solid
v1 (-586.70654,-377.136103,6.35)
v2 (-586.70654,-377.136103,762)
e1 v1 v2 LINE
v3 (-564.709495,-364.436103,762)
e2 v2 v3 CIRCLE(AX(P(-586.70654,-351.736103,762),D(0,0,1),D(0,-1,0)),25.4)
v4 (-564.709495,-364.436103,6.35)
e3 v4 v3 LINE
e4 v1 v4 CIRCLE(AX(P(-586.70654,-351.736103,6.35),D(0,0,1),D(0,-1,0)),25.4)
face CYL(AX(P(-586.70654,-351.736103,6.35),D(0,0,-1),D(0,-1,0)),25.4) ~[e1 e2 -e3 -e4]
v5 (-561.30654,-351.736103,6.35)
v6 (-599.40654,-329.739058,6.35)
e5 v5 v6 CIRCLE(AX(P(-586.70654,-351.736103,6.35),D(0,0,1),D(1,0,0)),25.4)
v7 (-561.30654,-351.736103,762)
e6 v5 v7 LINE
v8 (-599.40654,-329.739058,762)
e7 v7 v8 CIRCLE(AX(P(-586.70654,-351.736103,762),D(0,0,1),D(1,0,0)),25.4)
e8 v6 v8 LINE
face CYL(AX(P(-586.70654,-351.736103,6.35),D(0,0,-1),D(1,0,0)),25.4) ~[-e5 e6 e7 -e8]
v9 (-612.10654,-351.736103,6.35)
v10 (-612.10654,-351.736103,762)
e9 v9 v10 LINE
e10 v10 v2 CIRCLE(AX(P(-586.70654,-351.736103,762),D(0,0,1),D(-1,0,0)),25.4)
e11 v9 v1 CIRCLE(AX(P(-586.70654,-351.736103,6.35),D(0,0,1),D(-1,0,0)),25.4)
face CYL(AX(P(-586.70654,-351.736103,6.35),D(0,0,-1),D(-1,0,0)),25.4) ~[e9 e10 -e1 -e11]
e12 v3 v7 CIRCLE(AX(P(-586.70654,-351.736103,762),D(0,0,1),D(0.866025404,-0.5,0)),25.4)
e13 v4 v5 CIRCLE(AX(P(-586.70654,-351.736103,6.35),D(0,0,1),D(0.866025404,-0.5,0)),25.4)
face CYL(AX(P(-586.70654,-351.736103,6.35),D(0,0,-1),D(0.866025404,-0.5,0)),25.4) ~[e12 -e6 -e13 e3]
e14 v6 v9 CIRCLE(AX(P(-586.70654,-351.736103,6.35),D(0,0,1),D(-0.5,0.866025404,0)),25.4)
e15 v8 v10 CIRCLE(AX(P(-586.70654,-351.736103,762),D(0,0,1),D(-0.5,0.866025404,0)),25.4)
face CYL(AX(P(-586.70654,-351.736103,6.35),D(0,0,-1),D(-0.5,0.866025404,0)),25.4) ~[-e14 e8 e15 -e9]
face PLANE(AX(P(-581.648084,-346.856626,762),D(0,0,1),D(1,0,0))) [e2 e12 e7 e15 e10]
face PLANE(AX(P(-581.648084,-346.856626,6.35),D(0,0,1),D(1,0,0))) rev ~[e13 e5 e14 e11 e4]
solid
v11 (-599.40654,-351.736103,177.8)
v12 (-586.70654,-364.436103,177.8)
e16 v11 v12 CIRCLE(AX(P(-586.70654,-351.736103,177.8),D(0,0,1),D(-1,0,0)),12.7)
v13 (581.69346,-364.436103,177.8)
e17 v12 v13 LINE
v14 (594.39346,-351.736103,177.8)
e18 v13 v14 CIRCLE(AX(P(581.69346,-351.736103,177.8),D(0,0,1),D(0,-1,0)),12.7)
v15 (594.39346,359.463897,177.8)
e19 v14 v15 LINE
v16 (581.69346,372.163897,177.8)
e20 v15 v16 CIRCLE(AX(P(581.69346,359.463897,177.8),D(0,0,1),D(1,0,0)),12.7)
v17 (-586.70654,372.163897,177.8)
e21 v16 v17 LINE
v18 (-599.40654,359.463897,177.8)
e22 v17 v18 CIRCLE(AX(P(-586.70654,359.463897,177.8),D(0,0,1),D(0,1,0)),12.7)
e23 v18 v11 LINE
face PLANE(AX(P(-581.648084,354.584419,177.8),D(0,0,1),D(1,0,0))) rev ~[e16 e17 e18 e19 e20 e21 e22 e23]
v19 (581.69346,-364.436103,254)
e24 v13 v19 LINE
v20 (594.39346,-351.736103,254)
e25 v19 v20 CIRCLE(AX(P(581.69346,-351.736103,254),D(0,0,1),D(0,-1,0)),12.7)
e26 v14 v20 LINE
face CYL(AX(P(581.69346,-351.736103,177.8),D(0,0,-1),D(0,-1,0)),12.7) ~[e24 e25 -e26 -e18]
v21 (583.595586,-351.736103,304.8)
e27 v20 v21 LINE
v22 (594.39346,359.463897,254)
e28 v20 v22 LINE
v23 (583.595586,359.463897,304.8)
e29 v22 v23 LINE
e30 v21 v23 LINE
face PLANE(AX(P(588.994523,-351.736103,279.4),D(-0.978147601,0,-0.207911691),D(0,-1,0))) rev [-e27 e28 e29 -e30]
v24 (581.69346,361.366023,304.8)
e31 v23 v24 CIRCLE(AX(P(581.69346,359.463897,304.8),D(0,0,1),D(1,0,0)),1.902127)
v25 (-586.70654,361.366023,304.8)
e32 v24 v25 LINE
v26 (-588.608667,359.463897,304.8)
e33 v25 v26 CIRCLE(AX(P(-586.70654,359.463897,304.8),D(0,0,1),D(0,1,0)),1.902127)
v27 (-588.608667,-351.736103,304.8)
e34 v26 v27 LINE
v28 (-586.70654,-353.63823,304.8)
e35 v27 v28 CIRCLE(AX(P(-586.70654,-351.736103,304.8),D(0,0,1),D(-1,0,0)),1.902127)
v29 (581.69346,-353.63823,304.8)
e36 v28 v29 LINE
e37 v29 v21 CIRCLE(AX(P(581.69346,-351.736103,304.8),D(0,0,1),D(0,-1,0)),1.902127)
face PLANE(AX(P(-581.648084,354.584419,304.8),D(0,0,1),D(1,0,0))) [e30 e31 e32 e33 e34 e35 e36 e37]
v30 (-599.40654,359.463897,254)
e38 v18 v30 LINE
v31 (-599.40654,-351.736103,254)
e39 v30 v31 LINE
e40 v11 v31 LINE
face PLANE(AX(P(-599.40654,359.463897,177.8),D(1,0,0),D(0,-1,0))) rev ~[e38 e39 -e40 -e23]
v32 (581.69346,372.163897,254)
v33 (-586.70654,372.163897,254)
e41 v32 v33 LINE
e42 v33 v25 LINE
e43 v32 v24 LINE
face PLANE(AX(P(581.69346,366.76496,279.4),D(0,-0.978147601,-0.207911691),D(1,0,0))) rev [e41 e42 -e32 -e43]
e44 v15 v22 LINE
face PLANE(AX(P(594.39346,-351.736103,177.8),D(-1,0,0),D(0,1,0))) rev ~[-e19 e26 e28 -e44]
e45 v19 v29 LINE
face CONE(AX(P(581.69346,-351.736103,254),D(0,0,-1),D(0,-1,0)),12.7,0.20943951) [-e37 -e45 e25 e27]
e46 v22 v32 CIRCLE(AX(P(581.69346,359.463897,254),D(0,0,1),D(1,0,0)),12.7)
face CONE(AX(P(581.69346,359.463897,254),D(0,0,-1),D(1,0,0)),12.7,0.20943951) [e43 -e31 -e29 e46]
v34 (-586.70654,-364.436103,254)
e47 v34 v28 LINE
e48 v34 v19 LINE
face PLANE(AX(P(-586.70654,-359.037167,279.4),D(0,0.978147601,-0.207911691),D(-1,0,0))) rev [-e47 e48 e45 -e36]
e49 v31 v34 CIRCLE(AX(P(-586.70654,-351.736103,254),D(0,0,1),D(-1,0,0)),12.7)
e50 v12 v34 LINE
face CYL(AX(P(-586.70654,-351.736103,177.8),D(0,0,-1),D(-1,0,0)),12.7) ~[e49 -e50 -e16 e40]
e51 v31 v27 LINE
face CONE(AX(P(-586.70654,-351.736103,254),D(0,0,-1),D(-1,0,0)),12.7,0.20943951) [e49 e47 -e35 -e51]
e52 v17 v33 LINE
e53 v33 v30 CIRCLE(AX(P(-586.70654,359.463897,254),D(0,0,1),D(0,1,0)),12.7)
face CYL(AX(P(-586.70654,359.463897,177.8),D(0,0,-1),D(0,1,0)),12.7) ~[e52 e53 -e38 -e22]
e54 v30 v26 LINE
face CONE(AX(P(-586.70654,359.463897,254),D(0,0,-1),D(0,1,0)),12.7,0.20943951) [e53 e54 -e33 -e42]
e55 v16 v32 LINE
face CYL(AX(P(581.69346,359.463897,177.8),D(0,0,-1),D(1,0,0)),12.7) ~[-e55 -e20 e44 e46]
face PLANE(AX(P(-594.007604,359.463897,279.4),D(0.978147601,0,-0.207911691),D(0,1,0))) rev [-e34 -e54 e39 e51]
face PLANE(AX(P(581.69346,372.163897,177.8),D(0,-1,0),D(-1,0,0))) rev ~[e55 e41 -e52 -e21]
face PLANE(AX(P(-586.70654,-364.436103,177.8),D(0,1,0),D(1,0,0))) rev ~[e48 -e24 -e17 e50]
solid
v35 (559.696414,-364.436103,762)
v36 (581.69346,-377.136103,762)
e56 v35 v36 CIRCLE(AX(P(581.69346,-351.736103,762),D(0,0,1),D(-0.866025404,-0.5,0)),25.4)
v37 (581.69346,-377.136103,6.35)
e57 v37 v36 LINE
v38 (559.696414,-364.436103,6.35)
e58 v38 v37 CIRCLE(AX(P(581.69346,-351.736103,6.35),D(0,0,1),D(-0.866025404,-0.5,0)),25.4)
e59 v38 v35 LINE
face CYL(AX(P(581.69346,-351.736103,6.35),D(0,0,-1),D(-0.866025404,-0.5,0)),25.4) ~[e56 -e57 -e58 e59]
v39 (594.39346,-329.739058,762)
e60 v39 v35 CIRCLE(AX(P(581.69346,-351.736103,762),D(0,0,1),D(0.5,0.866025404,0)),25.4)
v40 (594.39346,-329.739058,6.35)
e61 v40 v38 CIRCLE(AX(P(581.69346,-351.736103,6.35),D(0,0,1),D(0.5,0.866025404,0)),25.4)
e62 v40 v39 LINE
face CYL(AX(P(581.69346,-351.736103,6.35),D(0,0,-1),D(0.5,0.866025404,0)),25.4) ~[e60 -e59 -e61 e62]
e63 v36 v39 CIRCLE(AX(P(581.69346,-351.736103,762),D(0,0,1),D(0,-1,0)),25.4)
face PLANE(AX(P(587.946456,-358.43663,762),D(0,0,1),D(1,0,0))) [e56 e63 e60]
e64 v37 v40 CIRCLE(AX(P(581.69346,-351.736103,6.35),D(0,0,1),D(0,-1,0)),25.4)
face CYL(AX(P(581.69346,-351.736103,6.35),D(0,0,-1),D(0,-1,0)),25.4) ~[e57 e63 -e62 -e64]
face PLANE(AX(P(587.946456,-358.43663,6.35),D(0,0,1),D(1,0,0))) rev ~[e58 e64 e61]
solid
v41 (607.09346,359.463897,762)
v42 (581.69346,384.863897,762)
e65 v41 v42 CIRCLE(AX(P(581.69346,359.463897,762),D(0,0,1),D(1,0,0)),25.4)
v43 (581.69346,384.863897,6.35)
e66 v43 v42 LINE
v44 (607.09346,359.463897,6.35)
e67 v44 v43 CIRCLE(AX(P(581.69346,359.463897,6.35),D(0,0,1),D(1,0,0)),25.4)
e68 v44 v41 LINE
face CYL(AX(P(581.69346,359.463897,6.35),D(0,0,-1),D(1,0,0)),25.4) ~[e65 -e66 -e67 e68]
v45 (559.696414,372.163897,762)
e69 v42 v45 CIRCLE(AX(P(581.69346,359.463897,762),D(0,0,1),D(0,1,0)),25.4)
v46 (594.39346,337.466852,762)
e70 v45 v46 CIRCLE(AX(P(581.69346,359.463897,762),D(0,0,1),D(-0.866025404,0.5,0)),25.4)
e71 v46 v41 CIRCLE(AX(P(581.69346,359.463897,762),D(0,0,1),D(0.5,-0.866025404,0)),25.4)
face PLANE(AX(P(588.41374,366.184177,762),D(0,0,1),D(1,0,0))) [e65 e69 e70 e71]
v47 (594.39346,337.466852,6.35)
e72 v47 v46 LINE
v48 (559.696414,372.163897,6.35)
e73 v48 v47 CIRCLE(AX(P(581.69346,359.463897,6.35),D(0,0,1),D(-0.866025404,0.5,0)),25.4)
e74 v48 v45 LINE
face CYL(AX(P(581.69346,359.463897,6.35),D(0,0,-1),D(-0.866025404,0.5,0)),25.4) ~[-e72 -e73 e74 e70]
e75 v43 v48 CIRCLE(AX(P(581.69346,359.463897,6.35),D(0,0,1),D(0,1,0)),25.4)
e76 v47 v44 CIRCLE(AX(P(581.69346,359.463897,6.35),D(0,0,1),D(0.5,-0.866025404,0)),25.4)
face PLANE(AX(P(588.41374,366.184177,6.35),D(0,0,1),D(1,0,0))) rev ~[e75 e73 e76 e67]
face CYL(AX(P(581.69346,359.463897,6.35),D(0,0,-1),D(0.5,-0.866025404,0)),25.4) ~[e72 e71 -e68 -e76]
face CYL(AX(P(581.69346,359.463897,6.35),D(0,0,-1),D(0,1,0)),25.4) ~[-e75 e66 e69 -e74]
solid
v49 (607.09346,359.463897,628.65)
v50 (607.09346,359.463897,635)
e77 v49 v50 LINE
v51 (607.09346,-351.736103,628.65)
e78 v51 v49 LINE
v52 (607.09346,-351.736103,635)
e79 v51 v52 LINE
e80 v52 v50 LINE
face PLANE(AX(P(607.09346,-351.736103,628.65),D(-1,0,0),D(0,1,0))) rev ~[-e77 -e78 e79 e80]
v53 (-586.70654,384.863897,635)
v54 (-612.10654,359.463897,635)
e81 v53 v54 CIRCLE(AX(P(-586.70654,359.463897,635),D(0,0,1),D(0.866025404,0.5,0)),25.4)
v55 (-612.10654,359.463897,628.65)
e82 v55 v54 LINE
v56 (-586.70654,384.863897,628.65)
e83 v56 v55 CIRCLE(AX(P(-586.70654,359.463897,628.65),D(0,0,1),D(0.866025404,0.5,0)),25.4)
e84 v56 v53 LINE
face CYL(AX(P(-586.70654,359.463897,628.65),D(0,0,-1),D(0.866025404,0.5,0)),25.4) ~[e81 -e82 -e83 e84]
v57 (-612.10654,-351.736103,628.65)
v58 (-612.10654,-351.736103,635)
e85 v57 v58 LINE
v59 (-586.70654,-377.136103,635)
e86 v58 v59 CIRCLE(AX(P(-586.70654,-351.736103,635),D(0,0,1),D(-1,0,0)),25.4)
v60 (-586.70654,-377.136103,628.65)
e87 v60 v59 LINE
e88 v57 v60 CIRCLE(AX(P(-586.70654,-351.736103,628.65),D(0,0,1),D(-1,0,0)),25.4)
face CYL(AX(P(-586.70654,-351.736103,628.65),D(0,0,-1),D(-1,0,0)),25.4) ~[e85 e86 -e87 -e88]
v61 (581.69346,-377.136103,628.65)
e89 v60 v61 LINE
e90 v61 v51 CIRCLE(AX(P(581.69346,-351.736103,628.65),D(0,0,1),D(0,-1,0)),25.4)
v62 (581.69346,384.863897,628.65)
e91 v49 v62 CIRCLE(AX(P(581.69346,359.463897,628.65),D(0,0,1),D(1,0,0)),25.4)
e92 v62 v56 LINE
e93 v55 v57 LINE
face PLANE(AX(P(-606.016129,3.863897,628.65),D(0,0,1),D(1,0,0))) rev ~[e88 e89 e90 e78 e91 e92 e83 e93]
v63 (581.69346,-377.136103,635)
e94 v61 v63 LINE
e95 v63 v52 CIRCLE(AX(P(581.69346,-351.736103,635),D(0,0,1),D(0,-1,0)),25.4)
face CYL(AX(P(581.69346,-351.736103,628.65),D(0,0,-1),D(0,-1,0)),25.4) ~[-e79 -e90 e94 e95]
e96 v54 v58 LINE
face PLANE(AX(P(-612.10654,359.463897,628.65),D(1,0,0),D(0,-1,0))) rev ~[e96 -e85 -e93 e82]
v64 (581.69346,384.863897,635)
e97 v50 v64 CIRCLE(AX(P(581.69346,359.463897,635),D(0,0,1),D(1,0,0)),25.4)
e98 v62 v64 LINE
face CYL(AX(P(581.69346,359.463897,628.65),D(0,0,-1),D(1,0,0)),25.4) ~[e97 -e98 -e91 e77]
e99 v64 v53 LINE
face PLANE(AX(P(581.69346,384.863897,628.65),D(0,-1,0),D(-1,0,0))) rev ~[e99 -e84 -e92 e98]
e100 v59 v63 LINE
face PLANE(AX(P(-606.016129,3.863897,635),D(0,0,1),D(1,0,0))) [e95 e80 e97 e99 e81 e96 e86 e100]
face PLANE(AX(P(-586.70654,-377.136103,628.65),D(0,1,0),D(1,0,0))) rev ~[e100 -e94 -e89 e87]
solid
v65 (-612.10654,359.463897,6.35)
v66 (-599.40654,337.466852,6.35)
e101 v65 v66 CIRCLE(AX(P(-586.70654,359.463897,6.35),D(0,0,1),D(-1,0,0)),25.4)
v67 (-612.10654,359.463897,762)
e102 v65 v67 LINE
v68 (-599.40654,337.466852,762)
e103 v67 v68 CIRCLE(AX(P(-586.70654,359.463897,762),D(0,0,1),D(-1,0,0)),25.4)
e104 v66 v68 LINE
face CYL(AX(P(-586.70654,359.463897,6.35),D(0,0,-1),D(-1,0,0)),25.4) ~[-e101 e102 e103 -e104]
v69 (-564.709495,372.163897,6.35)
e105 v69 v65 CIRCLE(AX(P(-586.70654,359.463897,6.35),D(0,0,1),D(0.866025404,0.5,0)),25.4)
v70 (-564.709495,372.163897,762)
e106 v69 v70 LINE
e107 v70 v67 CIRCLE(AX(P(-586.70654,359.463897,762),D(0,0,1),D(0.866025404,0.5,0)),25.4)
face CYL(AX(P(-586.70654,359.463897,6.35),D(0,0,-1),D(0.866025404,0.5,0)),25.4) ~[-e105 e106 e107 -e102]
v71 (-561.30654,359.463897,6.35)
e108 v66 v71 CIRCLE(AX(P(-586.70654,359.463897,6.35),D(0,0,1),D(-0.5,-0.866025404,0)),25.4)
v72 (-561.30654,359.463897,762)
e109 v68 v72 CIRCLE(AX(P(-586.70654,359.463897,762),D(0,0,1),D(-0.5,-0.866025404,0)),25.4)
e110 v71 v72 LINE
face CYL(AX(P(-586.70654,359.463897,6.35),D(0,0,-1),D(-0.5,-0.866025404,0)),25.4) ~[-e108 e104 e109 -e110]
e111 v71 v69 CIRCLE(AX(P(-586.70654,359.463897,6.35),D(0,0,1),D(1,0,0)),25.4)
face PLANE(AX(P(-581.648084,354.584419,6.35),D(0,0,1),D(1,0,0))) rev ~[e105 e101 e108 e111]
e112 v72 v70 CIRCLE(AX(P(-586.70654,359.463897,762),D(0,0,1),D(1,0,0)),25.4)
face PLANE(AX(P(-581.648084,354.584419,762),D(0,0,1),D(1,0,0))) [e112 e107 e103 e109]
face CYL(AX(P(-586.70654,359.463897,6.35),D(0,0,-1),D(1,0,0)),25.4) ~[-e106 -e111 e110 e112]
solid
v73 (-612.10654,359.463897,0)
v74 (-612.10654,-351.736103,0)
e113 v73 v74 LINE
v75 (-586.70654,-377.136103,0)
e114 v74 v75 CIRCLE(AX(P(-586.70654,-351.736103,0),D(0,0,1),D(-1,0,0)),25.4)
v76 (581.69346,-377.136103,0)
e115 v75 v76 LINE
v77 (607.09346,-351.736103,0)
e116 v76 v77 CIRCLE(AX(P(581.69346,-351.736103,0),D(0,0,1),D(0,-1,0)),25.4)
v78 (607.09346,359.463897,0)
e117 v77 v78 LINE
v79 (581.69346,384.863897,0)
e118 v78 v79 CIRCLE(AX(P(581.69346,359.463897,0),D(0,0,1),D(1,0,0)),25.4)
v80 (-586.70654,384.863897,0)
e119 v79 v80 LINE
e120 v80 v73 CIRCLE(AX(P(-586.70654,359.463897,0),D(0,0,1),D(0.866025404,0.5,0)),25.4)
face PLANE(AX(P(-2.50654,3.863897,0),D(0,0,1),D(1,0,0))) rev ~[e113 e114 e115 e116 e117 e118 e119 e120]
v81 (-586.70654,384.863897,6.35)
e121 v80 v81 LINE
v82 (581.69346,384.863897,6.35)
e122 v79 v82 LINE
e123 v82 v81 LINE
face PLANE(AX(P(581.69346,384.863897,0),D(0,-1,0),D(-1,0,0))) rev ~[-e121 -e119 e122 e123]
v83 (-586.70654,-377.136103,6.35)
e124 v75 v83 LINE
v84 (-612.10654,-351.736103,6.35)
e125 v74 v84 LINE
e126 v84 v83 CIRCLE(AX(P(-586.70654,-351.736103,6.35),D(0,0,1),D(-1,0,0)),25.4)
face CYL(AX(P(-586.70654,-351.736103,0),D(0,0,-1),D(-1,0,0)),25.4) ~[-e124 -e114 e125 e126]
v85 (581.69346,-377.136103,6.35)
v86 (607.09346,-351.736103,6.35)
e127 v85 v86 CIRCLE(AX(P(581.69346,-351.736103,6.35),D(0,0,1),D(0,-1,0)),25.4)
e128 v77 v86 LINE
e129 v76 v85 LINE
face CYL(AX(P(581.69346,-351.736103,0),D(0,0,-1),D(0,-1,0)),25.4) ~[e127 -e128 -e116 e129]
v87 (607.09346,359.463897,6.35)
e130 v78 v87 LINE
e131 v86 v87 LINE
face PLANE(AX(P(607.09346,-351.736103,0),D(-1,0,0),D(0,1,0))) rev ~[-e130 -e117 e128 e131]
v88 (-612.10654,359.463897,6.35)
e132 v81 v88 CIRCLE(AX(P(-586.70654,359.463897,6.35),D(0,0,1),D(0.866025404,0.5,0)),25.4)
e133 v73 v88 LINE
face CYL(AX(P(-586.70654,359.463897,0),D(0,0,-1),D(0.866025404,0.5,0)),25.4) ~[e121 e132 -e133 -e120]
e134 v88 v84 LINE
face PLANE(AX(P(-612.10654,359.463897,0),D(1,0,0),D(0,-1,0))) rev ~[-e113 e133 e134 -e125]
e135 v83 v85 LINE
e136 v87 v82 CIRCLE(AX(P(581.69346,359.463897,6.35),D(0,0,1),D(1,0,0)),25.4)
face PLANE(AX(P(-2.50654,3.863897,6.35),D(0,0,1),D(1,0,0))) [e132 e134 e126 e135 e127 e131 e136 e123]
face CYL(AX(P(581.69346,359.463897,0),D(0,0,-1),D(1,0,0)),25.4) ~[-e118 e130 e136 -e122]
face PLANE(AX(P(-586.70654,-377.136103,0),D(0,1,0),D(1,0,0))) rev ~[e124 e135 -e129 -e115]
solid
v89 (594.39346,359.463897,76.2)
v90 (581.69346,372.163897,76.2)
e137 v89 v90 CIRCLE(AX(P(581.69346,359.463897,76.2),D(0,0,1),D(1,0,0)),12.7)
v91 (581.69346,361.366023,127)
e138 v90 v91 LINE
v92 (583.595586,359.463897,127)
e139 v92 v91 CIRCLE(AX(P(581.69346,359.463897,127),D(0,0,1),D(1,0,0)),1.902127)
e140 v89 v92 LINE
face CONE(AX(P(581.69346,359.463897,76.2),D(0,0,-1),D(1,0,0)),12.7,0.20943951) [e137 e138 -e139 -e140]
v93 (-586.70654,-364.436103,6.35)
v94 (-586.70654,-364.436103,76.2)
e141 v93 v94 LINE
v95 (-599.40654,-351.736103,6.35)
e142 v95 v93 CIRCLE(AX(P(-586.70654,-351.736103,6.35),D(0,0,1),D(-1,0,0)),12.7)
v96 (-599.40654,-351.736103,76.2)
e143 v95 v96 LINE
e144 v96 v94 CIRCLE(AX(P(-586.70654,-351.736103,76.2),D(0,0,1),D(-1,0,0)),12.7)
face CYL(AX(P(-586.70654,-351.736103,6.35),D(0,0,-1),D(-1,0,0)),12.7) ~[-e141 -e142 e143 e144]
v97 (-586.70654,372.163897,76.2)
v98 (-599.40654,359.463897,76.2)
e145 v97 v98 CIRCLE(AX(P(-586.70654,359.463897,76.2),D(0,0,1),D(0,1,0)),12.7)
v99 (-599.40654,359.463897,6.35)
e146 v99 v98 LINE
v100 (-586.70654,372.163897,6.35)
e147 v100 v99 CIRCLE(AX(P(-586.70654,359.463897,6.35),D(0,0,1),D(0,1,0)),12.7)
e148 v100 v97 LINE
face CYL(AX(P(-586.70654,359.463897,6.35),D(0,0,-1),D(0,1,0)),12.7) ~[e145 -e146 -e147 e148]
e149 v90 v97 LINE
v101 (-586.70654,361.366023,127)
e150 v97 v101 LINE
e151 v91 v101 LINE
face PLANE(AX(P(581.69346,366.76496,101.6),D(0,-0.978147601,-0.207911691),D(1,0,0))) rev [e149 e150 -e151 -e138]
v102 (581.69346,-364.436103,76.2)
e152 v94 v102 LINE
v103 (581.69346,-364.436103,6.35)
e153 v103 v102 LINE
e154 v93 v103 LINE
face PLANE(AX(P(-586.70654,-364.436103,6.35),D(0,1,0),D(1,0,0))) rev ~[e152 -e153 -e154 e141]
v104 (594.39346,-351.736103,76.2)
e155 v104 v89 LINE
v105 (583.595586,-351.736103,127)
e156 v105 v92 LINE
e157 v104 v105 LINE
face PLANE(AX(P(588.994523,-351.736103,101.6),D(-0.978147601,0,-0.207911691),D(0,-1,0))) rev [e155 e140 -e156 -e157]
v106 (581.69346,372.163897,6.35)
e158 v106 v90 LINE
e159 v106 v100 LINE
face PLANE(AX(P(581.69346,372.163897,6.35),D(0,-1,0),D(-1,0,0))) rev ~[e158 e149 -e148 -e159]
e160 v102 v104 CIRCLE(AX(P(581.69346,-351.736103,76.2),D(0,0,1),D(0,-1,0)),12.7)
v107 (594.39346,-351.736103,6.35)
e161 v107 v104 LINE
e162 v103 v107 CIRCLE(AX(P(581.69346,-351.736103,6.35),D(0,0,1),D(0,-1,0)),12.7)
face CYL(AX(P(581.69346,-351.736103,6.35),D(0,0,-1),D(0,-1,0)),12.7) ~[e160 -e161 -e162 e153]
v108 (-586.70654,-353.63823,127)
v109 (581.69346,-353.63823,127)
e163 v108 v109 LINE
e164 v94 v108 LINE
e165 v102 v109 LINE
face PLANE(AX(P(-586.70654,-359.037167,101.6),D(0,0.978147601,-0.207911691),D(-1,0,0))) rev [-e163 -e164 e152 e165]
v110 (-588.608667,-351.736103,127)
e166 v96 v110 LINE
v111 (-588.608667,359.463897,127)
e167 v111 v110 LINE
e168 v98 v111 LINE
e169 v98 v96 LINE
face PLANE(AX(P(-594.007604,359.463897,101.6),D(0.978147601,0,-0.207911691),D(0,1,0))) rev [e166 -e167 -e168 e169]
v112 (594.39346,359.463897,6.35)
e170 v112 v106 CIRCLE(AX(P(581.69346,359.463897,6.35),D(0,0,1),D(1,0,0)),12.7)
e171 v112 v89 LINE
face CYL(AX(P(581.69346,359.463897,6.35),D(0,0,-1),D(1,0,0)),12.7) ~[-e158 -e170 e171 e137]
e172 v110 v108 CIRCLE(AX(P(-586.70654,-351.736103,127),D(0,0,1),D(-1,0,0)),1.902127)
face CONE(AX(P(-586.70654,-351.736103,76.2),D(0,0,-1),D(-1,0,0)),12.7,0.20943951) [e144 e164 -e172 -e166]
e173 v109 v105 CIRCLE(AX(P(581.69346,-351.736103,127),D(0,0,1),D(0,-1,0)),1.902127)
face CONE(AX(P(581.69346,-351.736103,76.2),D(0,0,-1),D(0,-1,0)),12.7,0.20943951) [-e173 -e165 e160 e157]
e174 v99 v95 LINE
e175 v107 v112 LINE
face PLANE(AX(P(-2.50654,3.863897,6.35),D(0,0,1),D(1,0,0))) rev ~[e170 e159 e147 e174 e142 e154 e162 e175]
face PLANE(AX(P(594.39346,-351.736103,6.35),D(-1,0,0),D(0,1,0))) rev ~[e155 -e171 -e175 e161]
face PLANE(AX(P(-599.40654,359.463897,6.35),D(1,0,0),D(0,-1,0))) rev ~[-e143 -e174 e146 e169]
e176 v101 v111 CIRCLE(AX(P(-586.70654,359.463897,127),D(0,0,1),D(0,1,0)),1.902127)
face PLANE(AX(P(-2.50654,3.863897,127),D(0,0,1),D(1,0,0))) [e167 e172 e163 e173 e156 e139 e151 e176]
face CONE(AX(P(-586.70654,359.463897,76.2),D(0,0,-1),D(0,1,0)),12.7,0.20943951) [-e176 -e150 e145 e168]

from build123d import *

# Parameters (mm, degrees)
F1_DEPTH = 6.35
F2_START = 6.35
F2_DEPTH = 120.65
F3_SIZE2 = 10.7978733328
F3_SIZE  = 50.8
F4_START = 6.35
F4_DEPTH = 755.65
F5_START = 628.65
F5_DEPTH = 6.35
F6_START = 177.8
F6_DEPTH = 127
F7_SIZE2 = 10.7978733328
F7_SIZE  = 50.8


# Not quite as in the source:
# - a feature names something its author has since deleted; it is built from what else it names


with BuildPart() as f1:
    # F0 (on Top) → F1 (new body)
    with BuildSketch(Plane.XY):
        Polygon((-421.6065403938, 372.1638967734), (-535.9065403938, 372.1638967734), (-535.9065403938, -364.4361032266), (-421.6065403938, -364.4361032266), (-383.5065403938, -364.4361032266), (378.4934596062, -364.4361032266), (416.5934596062, -364.4361032266), (530.8934596062, -364.4361032266), (530.8934596062, -219.4858193398), (530.8934596062, 237.7141806602), (530.8934596062, 372.1638967734), (416.5934596062, 372.1638967734), (378.4934596062, 372.1638967734), (-383.5065403938, 372.1638967734), align=None)
        Polygon((530.8934596062, 384.8638967734), (-535.9065403938, 384.8638967734), (-535.9065403938, 372.1638967734), (-421.6065403938, 372.1638967734), (-383.5065403938, 372.1638967734), (378.4934596062, 372.1638967734), (416.5934596062, 372.1638967734), (530.8934596062, 372.1638967734), align=None)
        Polygon((-421.6065403938, -364.4361032266), (-535.9065403938, -364.4361032266), (-535.9065403938, -377.1361032266), (530.8934596062, -377.1361032266), (530.8934596062, -364.4361032266), (416.5934596062, -364.4361032266), (378.4934596062, -364.4361032266), (-383.5065403938, -364.4361032266), align=None)
        with BuildLine():
            Line((607.0934596062, -351.7361032266), (607.0934596062, 359.4638967734))
            ThreePointArc((607.0934596062, 359.4638967734), (603.6905048623, 346.7638967734), (594.3934596062, 337.4668515172))
            Line((594.3934596062, 337.4668515172), (594.3934596062, 22.9138967734))
            Line((594.3934596062, 22.9138967734), (594.3934596062, -15.1861032266))
            Line((594.3934596062, -15.1861032266), (594.3934596062, -329.7390579705))
            ThreePointArc((594.3934596062, -329.7390579705), (603.6905048623, -339.0361032266), (607.0934596062, -351.7361032266))
        make_face()
        with BuildLine():
            ThreePointArc((-599.4065403938, 337.4668515172), (-608.70358565, 346.7638967734), (-612.1065403938, 359.4638967734))
            Line((-612.1065403938, 359.4638967734), (-612.1065403938, -351.7361032266))
            ThreePointArc((-612.1065403938, -351.7361032266), (-608.70358565, -339.0361032266), (-599.4065403938, -329.7390579705))
            Line((-599.4065403938, -329.7390579705), (-599.4065403938, -15.1861032266))
            Line((-599.4065403938, -15.1861032266), (-599.4065403938, 22.9138967734))
            Line((-599.4065403938, 22.9138967734), (-599.4065403938, 337.4668515172))
        make_face()
        with BuildLine():
            ThreePointArc((-561.3065403938, 359.4638967734), (-562.1720244061, 366.037900519), (-564.7094951377, 372.1638967734))
            Line((-564.7094951377, 372.1638967734), (-586.7065403938, 372.1638967734))
            ThreePointArc((-586.7065403938, 372.1638967734), (-595.6867965149, 368.4441528944), (-599.4065403938, 359.4638967734))
            Line((-599.4065403938, 359.4638967734), (-599.4065403938, 337.4668515172))
            ThreePointArc((-599.4065403938, 337.4668515172), (-574.0065403938, 337.4668515172), (-561.3065403938, 359.4638967734))
        make_face()
        with BuildLine():
            Line((581.6934596062, 372.1638967734), (559.69641435, 372.1638967734))
            ThreePointArc((559.69641435, 372.1638967734), (563.732947364, 341.5033845312), (594.3934596062, 337.4668515172))
            Line((594.3934596062, 337.4668515172), (594.3934596062, 359.4638967734))
            ThreePointArc((594.3934596062, 359.4638967734), (590.6737157272, 368.4441528944), (581.6934596062, 372.1638967734))
        make_face()
        with BuildLine():
            ThreePointArc((-561.3065403938, -351.7361032266), (-574.0065403938, -329.7390579705), (-599.4065403938, -329.7390579705))
            Line((-599.4065403938, -329.7390579705), (-599.4065403938, -351.7361032266))
            ThreePointArc((-599.4065403938, -351.7361032266), (-595.6867965149, -360.7163593477), (-586.7065403938, -364.4361032266))
            Line((-586.7065403938, -364.4361032266), (-564.7094951377, -364.4361032266))
            ThreePointArc((-564.7094951377, -364.4361032266), (-562.1720244061, -358.3101069722), (-561.3065403938, -351.7361032266))
        make_face()
        with BuildLine():
            Line((-535.9065403938, 372.1638967734), (-564.7094951377, 372.1638967734))
            ThreePointArc((-564.7094951377, 372.1638967734), (-562.1720244061, 366.037900519), (-561.3065403938, 359.4638967734))
            ThreePointArc((-561.3065403938, 359.4638967734), (-574.0065403938, 337.4668515172), (-599.4065403938, 337.4668515172))
            Line((-599.4065403938, 337.4668515172), (-599.4065403938, 22.9138967734))
            Line((-599.4065403938, 22.9138967734), (-599.4065403938, -15.1861032266))
            Line((-599.4065403938, -15.1861032266), (-599.4065403938, -329.7390579705))
            ThreePointArc((-599.4065403938, -329.7390579705), (-574.0065403938, -329.7390579705), (-561.3065403938, -351.7361032266))
            ThreePointArc((-561.3065403938, -351.7361032266), (-562.1720244061, -358.3101069722), (-564.7094951377, -364.4361032266))
            Line((-564.7094951377, -364.4361032266), (-535.9065403938, -364.4361032266))
            Line((-535.9065403938, -364.4361032266), (-535.9065403938, 372.1638967734))
        make_face()
        with BuildLine():
            Line((594.3934596062, -351.7361032266), (594.3934596062, -329.7390579705))
            ThreePointArc((594.3934596062, -329.7390579705), (563.732947364, -333.7755909845), (559.69641435, -364.4361032266))
            Line((559.69641435, -364.4361032266), (581.6934596062, -364.4361032266))
            ThreePointArc((581.6934596062, -364.4361032266), (590.6737157272, -360.7163593477), (594.3934596062, -351.7361032266))
        make_face()
        with BuildLine():
            Line((559.69641435, 372.1638967734), (530.8934596062, 372.1638967734))
            Line((530.8934596062, 372.1638967734), (530.8934596062, 237.7141806602))
            Line((530.8934596062, 237.7141806602), (530.8934596062, -219.4858193398))
            Line((530.8934596062, -219.4858193398), (530.8934596062, -364.4361032266))
            Line((530.8934596062, -364.4361032266), (559.69641435, -364.4361032266))
            ThreePointArc((559.69641435, -364.4361032266), (563.732947364, -333.7755909845), (594.3934596062, -329.7390579705))
            Line((594.3934596062, -329.7390579705), (594.3934596062, -15.1861032266))
            Line((594.3934596062, -15.1861032266), (594.3934596062, 22.9138967734))
            Line((594.3934596062, 22.9138967734), (594.3934596062, 337.4668515172))
            ThreePointArc((594.3934596062, 337.4668515172), (563.732947364, 341.5033845312), (559.69641435, 372.1638967734))
        make_face()
        with BuildLine():
            ThreePointArc((581.6934596062, -377.1361032266), (599.6539718483, -369.6966154688), (607.0934596062, -351.7361032266))
            ThreePointArc((607.0934596062, -351.7361032266), (603.6905048623, -339.0361032266), (594.3934596062, -329.7390579705))
            Line((594.3934596062, -329.7390579705), (594.3934596062, -351.7361032266))
            ThreePointArc((594.3934596062, -351.7361032266), (590.6737157272, -360.7163593477), (581.6934596062, -364.4361032266))
            Line((581.6934596062, -364.4361032266), (559.69641435, -364.4361032266))
            ThreePointArc((559.69641435, -364.4361032266), (568.9934596062, -373.7331484828), (581.6934596062, -377.1361032266))
        make_face()
        with BuildLine():
            Line((530.8934596062, -364.4361032266), (530.8934596062, -377.1361032266))
            Line((530.8934596062, -377.1361032266), (581.6934596062, -377.1361032266))
            ThreePointArc((581.6934596062, -377.1361032266), (568.9934596062, -373.7331484828), (559.69641435, -364.4361032266))
            Line((559.69641435, -364.4361032266), (530.8934596062, -364.4361032266))
        make_face()
        with BuildLine():
            ThreePointArc((607.0934596062, 359.4638967734), (599.6539718483, 377.4244090155), (581.6934596062, 384.8638967734))
            ThreePointArc((581.6934596062, 384.8638967734), (568.9934596062, 381.4609420295), (559.69641435, 372.1638967734))
            Line((559.69641435, 372.1638967734), (581.6934596062, 372.1638967734))
            ThreePointArc((581.6934596062, 372.1638967734), (590.6737157272, 368.4441528944), (594.3934596062, 359.4638967734))
            Line((594.3934596062, 359.4638967734), (594.3934596062, 337.4668515172))
            ThreePointArc((594.3934596062, 337.4668515172), (603.6905048623, 346.7638967734), (607.0934596062, 359.4638967734))
        make_face()
        with BuildLine():
            Line((581.6934596062, 384.8638967734), (530.8934596062, 384.8638967734))
            Line((530.8934596062, 384.8638967734), (530.8934596062, 372.1638967734))
            Line((530.8934596062, 372.1638967734), (559.69641435, 372.1638967734))
            ThreePointArc((559.69641435, 372.1638967734), (568.9934596062, 381.4609420295), (581.6934596062, 384.8638967734))
        make_face()
        with BuildLine():
            Line((-535.9065403938, -377.1361032266), (-535.9065403938, -364.4361032266))
            Line((-535.9065403938, -364.4361032266), (-564.7094951377, -364.4361032266))
            ThreePointArc((-564.7094951377, -364.4361032266), (-574.0065403938, -373.7331484828), (-586.7065403938, -377.1361032266))
            Line((-586.7065403938, -377.1361032266), (-535.9065403938, -377.1361032266))
        make_face()
        with BuildLine():
            ThreePointArc((-599.4065403938, -329.7390579705), (-608.70358565, -339.0361032266), (-612.1065403938, -351.7361032266))
            ThreePointArc((-612.1065403938, -351.7361032266), (-604.667052636, -369.6966154688), (-586.7065403938, -377.1361032266))
            ThreePointArc((-586.7065403938, -377.1361032266), (-574.0065403938, -373.7331484828), (-564.7094951377, -364.4361032266))
            Line((-564.7094951377, -364.4361032266), (-586.7065403938, -364.4361032266))
            ThreePointArc((-586.7065403938, -364.4361032266), (-595.6867965149, -360.7163593477), (-599.4065403938, -351.7361032266))
            Line((-599.4065403938, -351.7361032266), (-599.4065403938, -329.7390579705))
        make_face()
        with BuildLine():
            Line((-535.9065403938, 384.8638967734), (-586.7065403938, 384.8638967734))
            ThreePointArc((-586.7065403938, 384.8638967734), (-574.0065403938, 381.4609420295), (-564.7094951377, 372.1638967734))
            Line((-564.7094951377, 372.1638967734), (-535.9065403938, 372.1638967734))
            Line((-535.9065403938, 372.1638967734), (-535.9065403938, 384.8638967734))
        make_face()
        with BuildLine():
            ThreePointArc((-564.7094951377, 372.1638967734), (-574.0065403938, 381.4609420295), (-586.7065403938, 384.8638967734))
            ThreePointArc((-586.7065403938, 384.8638967734), (-604.667052636, 377.4244090155), (-612.1065403938, 359.4638967734))
            ThreePointArc((-612.1065403938, 359.4638967734), (-608.70358565, 346.7638967734), (-599.4065403938, 337.4668515172))
            Line((-599.4065403938, 337.4668515172), (-599.4065403938, 359.4638967734))
            ThreePointArc((-599.4065403938, 359.4638967734), (-595.6867965149, 368.4441528944), (-586.7065403938, 372.1638967734))
            Line((-586.7065403938, 372.1638967734), (-564.7094951377, 372.1638967734))
        make_face()
    extrude(amount=F1_DEPTH)


with BuildPart() as f2:
    # F0 (on Top) → F2 (new body)
    with BuildSketch(Plane.XY.offset(F2_START)):
        Polygon((-421.6065403938, 372.1638967734), (-535.9065403938, 372.1638967734), (-535.9065403938, -364.4361032266), (-421.6065403938, -364.4361032266), (-383.5065403938, -364.4361032266), (378.4934596062, -364.4361032266), (416.5934596062, -364.4361032266), (530.8934596062, -364.4361032266), (530.8934596062, -219.4858193398), (530.8934596062, 237.7141806602), (530.8934596062, 372.1638967734), (416.5934596062, 372.1638967734), (378.4934596062, 372.1638967734), (-383.5065403938, 372.1638967734), align=None)
        with BuildLine():
            Line((-535.9065403938, 372.1638967734), (-564.7094951377, 372.1638967734))
            ThreePointArc((-564.7094951377, 372.1638967734), (-562.1720244061, 366.037900519), (-561.3065403938, 359.4638967734))
            ThreePointArc((-561.3065403938, 359.4638967734), (-574.0065403938, 337.4668515172), (-599.4065403938, 337.4668515172))
            Line((-599.4065403938, 337.4668515172), (-599.4065403938, 22.9138967734))
            Line((-599.4065403938, 22.9138967734), (-599.4065403938, -15.1861032266))
            Line((-599.4065403938, -15.1861032266), (-599.4065403938, -329.7390579705))
            ThreePointArc((-599.4065403938, -329.7390579705), (-574.0065403938, -329.7390579705), (-561.3065403938, -351.7361032266))
            ThreePointArc((-561.3065403938, -351.7361032266), (-562.1720244061, -358.3101069722), (-564.7094951377, -364.4361032266))
            Line((-564.7094951377, -364.4361032266), (-535.9065403938, -364.4361032266))
            Line((-535.9065403938, -364.4361032266), (-535.9065403938, 372.1638967734))
        make_face()
        with BuildLine():
            Line((559.69641435, 372.1638967734), (530.8934596062, 372.1638967734))
            Line((530.8934596062, 372.1638967734), (530.8934596062, 237.7141806602))
            Line((530.8934596062, 237.7141806602), (530.8934596062, -219.4858193398))
            Line((530.8934596062, -219.4858193398), (530.8934596062, -364.4361032266))
            Line((530.8934596062, -364.4361032266), (559.69641435, -364.4361032266))
            ThreePointArc((559.69641435, -364.4361032266), (563.732947364, -333.7755909845), (594.3934596062, -329.7390579705))
            Line((594.3934596062, -329.7390579705), (594.3934596062, -15.1861032266))
            Line((594.3934596062, -15.1861032266), (594.3934596062, 22.9138967734))
            Line((594.3934596062, 22.9138967734), (594.3934596062, 337.4668515172))
            ThreePointArc((594.3934596062, 337.4668515172), (563.732947364, 341.5033845312), (559.69641435, 372.1638967734))
        make_face()
        with BuildLine():
            ThreePointArc((-561.3065403938, 359.4638967734), (-562.1720244061, 366.037900519), (-564.7094951377, 372.1638967734))
            Line((-564.7094951377, 372.1638967734), (-586.7065403938, 372.1638967734))
            ThreePointArc((-586.7065403938, 372.1638967734), (-595.6867965149, 368.4441528944), (-599.4065403938, 359.4638967734))
            Line((-599.4065403938, 359.4638967734), (-599.4065403938, 337.4668515172))
            ThreePointArc((-599.4065403938, 337.4668515172), (-574.0065403938, 337.4668515172), (-561.3065403938, 359.4638967734))
        make_face()
        with BuildLine():
            Line((581.6934596062, 372.1638967734), (559.69641435, 372.1638967734))
            ThreePointArc((559.69641435, 372.1638967734), (563.732947364, 341.5033845312), (594.3934596062, 337.4668515172))
            Line((594.3934596062, 337.4668515172), (594.3934596062, 359.4638967734))
            ThreePointArc((594.3934596062, 359.4638967734), (590.6737157272, 368.4441528944), (581.6934596062, 372.1638967734))
        make_face()
        with BuildLine():
            ThreePointArc((-561.3065403938, -351.7361032266), (-574.0065403938, -329.7390579705), (-599.4065403938, -329.7390579705))
            Line((-599.4065403938, -329.7390579705), (-599.4065403938, -351.7361032266))
            ThreePointArc((-599.4065403938, -351.7361032266), (-595.6867965149, -360.7163593477), (-586.7065403938, -364.4361032266))
            Line((-586.7065403938, -364.4361032266), (-564.7094951377, -364.4361032266))
            ThreePointArc((-564.7094951377, -364.4361032266), (-562.1720244061, -358.3101069722), (-561.3065403938, -351.7361032266))
        make_face()
        with BuildLine():
            Line((594.3934596062, -351.7361032266), (594.3934596062, -329.7390579705))
            ThreePointArc((594.3934596062, -329.7390579705), (563.732947364, -333.7755909845), (559.69641435, -364.4361032266))
            Line((559.69641435, -364.4361032266), (581.6934596062, -364.4361032266))
            ThreePointArc((581.6934596062, -364.4361032266), (590.6737157272, -360.7163593477), (594.3934596062, -351.7361032266))
        make_face()
    extrude(amount=F2_DEPTH)

    # F3
    f3_edges = [f2.edges().sort_by_distance(p)[0] for p in [
        (590.673716, 368.444153, 127),
        (-2.50654, 372.163897, 127),
        (-595.686797, 368.444153, 127),
        (-599.40654, 3.863897, 127),
        (-595.686797, -360.716359, 127),
        (-2.50654, -364.436103, 127),
        (590.673716, -360.716359, 127),
        (594.39346, 3.863897, 127),
    ]]
    chamfer(f3_edges, length=F3_SIZE, length2=F3_SIZE2)


with BuildPart() as f4:
    # F0 (on Top) → F4 (new body)
    with BuildSketch(Plane.XY.offset(F4_START)):
        with BuildLine():
            ThreePointArc((581.6934596062, -377.1361032266), (599.6539718483, -369.6966154688), (607.0934596062, -351.7361032266))
            ThreePointArc((607.0934596062, -351.7361032266), (603.6905048623, -339.0361032266), (594.3934596062, -329.7390579705))
            Line((594.3934596062, -329.7390579705), (594.3934596062, -351.7361032266))
            ThreePointArc((594.3934596062, -351.7361032266), (590.6737157272, -360.7163593477), (581.6934596062, -364.4361032266))
            Line((581.6934596062, -364.4361032266), (559.69641435, -364.4361032266))
            ThreePointArc((559.69641435, -364.4361032266), (568.9934596062, -373.7331484828), (581.6934596062, -377.1361032266))
        make_face()
        with BuildLine():
            Line((594.3934596062, -351.7361032266), (594.3934596062, -329.7390579705))
            ThreePointArc((594.3934596062, -329.7390579705), (563.732947364, -333.7755909845), (559.69641435, -364.4361032266))
            Line((559.69641435, -364.4361032266), (581.6934596062, -364.4361032266))
            ThreePointArc((581.6934596062, -364.4361032266), (590.6737157272, -360.7163593477), (594.3934596062, -351.7361032266))
        make_face()
    extrude(amount=F4_DEPTH)


with BuildPart() as f4b:
    # F0 (on Top) → F4, piece 2 (new body)
    with BuildSketch(Plane.XY.offset(F4_START)):
        with BuildLine():
            ThreePointArc((-561.3065403938, 359.4638967734), (-562.1720244061, 366.037900519), (-564.7094951377, 372.1638967734))
            Line((-564.7094951377, 372.1638967734), (-586.7065403938, 372.1638967734))
            ThreePointArc((-586.7065403938, 372.1638967734), (-595.6867965149, 368.4441528944), (-599.4065403938, 359.4638967734))
            Line((-599.4065403938, 359.4638967734), (-599.4065403938, 337.4668515172))
            ThreePointArc((-599.4065403938, 337.4668515172), (-574.0065403938, 337.4668515172), (-561.3065403938, 359.4638967734))
        make_face()
        with BuildLine():
            ThreePointArc((-564.7094951377, 372.1638967734), (-574.0065403938, 381.4609420295), (-586.7065403938, 384.8638967734))
            ThreePointArc((-586.7065403938, 384.8638967734), (-604.667052636, 377.4244090155), (-612.1065403938, 359.4638967734))
            ThreePointArc((-612.1065403938, 359.4638967734), (-608.70358565, 346.7638967734), (-599.4065403938, 337.4668515172))
            Line((-599.4065403938, 337.4668515172), (-599.4065403938, 359.4638967734))
            ThreePointArc((-599.4065403938, 359.4638967734), (-595.6867965149, 368.4441528944), (-586.7065403938, 372.1638967734))
            Line((-586.7065403938, 372.1638967734), (-564.7094951377, 372.1638967734))
        make_face()
    extrude(amount=F4_DEPTH)


with BuildPart() as f4c:
    # F0 (on Top) → F4, piece 3 (new body)
    with BuildSketch(Plane.XY.offset(F4_START)):
        with BuildLine():
            ThreePointArc((-561.3065403938, -351.7361032266), (-574.0065403938, -329.7390579705), (-599.4065403938, -329.7390579705))
            Line((-599.4065403938, -329.7390579705), (-599.4065403938, -351.7361032266))
            ThreePointArc((-599.4065403938, -351.7361032266), (-595.6867965149, -360.7163593477), (-586.7065403938, -364.4361032266))
            Line((-586.7065403938, -364.4361032266), (-564.7094951377, -364.4361032266))
            ThreePointArc((-564.7094951377, -364.4361032266), (-562.1720244061, -358.3101069722), (-561.3065403938, -351.7361032266))
        make_face()
        with BuildLine():
            ThreePointArc((-599.4065403938, -329.7390579705), (-608.70358565, -339.0361032266), (-612.1065403938, -351.7361032266))
            ThreePointArc((-612.1065403938, -351.7361032266), (-604.667052636, -369.6966154688), (-586.7065403938, -377.1361032266))
            ThreePointArc((-586.7065403938, -377.1361032266), (-574.0065403938, -373.7331484828), (-564.7094951377, -364.4361032266))
            Line((-564.7094951377, -364.4361032266), (-586.7065403938, -364.4361032266))
            ThreePointArc((-586.7065403938, -364.4361032266), (-595.6867965149, -360.7163593477), (-599.4065403938, -351.7361032266))
            Line((-599.4065403938, -351.7361032266), (-599.4065403938, -329.7390579705))
        make_face()
    extrude(amount=F4_DEPTH)


with BuildPart() as f4d:
    # F0 (on Top) → F4, piece 4 (new body)
    with BuildSketch(Plane.XY.offset(F4_START)):
        with BuildLine():
            ThreePointArc((607.0934596062, 359.4638967734), (599.6539718483, 377.4244090155), (581.6934596062, 384.8638967734))
            ThreePointArc((581.6934596062, 384.8638967734), (568.9934596062, 381.4609420295), (559.69641435, 372.1638967734))
            Line((559.69641435, 372.1638967734), (581.6934596062, 372.1638967734))
            ThreePointArc((581.6934596062, 372.1638967734), (590.6737157272, 368.4441528944), (594.3934596062, 359.4638967734))
            Line((594.3934596062, 359.4638967734), (594.3934596062, 337.4668515172))
            ThreePointArc((594.3934596062, 337.4668515172), (603.6905048623, 346.7638967734), (607.0934596062, 359.4638967734))
        make_face()
        with BuildLine():
            Line((581.6934596062, 372.1638967734), (559.69641435, 372.1638967734))
            ThreePointArc((559.69641435, 372.1638967734), (563.732947364, 341.5033845312), (594.3934596062, 337.4668515172))
            Line((594.3934596062, 337.4668515172), (594.3934596062, 359.4638967734))
            ThreePointArc((594.3934596062, 359.4638967734), (590.6737157272, 368.4441528944), (581.6934596062, 372.1638967734))
        make_face()
    extrude(amount=F4_DEPTH)


with BuildPart() as f5:
    # F0 (on Top) → F5 (new body)
    with BuildSketch(Plane.XY.offset(F5_START)):
        with BuildLine():
            ThreePointArc((-599.4065403938, 337.4668515172), (-608.70358565, 346.7638967734), (-612.1065403938, 359.4638967734))
            Line((-612.1065403938, 359.4638967734), (-612.1065403938, -351.7361032266))
            ThreePointArc((-612.1065403938, -351.7361032266), (-608.70358565, -339.0361032266), (-599.4065403938, -329.7390579705))
            Line((-599.4065403938, -329.7390579705), (-599.4065403938, -15.1861032266))
            Line((-599.4065403938, -15.1861032266), (-599.4065403938, 22.9138967734))
            Line((-599.4065403938, 22.9138967734), (-599.4065403938, 337.4668515172))
        make_face()
        with BuildLine():
            Line((-535.9065403938, 372.1638967734), (-564.7094951377, 372.1638967734))
            ThreePointArc((-564.7094951377, 372.1638967734), (-562.1720244061, 366.037900519), (-561.3065403938, 359.4638967734))
            ThreePointArc((-561.3065403938, 359.4638967734), (-574.0065403938, 337.4668515172), (-599.4065403938, 337.4668515172))
            Line((-599.4065403938, 337.4668515172), (-599.4065403938, 22.9138967734))
            Line((-599.4065403938, 22.9138967734), (-599.4065403938, -15.1861032266))
            Line((-599.4065403938, -15.1861032266), (-599.4065403938, -329.7390579705))
            ThreePointArc((-599.4065403938, -329.7390579705), (-574.0065403938, -329.7390579705), (-561.3065403938, -351.7361032266))
            ThreePointArc((-561.3065403938, -351.7361032266), (-562.1720244061, -358.3101069722), (-564.7094951377, -364.4361032266))
            Line((-564.7094951377, -364.4361032266), (-535.9065403938, -364.4361032266))
            Line((-535.9065403938, -364.4361032266), (-535.9065403938, 372.1638967734))
        make_face()
        with BuildLine():
            ThreePointArc((-561.3065403938, 359.4638967734), (-562.1720244061, 366.037900519), (-564.7094951377, 372.1638967734))
            Line((-564.7094951377, 372.1638967734), (-586.7065403938, 372.1638967734))
            ThreePointArc((-586.7065403938, 372.1638967734), (-595.6867965149, 368.4441528944), (-599.4065403938, 359.4638967734))
            Line((-599.4065403938, 359.4638967734), (-599.4065403938, 337.4668515172))
            ThreePointArc((-599.4065403938, 337.4668515172), (-574.0065403938, 337.4668515172), (-561.3065403938, 359.4638967734))
        make_face()
        with BuildLine():
            ThreePointArc((-564.7094951377, 372.1638967734), (-574.0065403938, 381.4609420295), (-586.7065403938, 384.8638967734))
            ThreePointArc((-586.7065403938, 384.8638967734), (-604.667052636, 377.4244090155), (-612.1065403938, 359.4638967734))
            ThreePointArc((-612.1065403938, 359.4638967734), (-608.70358565, 346.7638967734), (-599.4065403938, 337.4668515172))
            Line((-599.4065403938, 337.4668515172), (-599.4065403938, 359.4638967734))
            ThreePointArc((-599.4065403938, 359.4638967734), (-595.6867965149, 368.4441528944), (-586.7065403938, 372.1638967734))
            Line((-586.7065403938, 372.1638967734), (-564.7094951377, 372.1638967734))
        make_face()
        Polygon((-421.6065403938, 372.1638967734), (-535.9065403938, 372.1638967734), (-535.9065403938, -364.4361032266), (-421.6065403938, -364.4361032266), (-383.5065403938, -364.4361032266), (378.4934596062, -364.4361032266), (416.5934596062, -364.4361032266), (530.8934596062, -364.4361032266), (530.8934596062, -219.4858193398), (530.8934596062, 237.7141806602), (530.8934596062, 372.1638967734), (416.5934596062, 372.1638967734), (378.4934596062, 372.1638967734), (-383.5065403938, 372.1638967734), align=None)
        with BuildLine():
            Line((-535.9065403938, 384.8638967734), (-586.7065403938, 384.8638967734))
            ThreePointArc((-586.7065403938, 384.8638967734), (-574.0065403938, 381.4609420295), (-564.7094951377, 372.1638967734))
            Line((-564.7094951377, 372.1638967734), (-535.9065403938, 372.1638967734))
            Line((-535.9065403938, 372.1638967734), (-535.9065403938, 384.8638967734))
        make_face()
        Polygon((530.8934596062, 384.8638967734), (-535.9065403938, 384.8638967734), (-535.9065403938, 372.1638967734), (-421.6065403938, 372.1638967734), (-383.5065403938, 372.1638967734), (378.4934596062, 372.1638967734), (416.5934596062, 372.1638967734), (530.8934596062, 372.1638967734), align=None)
        with BuildLine():
            ThreePointArc((-599.4065403938, -329.7390579705), (-608.70358565, -339.0361032266), (-612.1065403938, -351.7361032266))
            ThreePointArc((-612.1065403938, -351.7361032266), (-604.667052636, -369.6966154688), (-586.7065403938, -377.1361032266))
            ThreePointArc((-586.7065403938, -377.1361032266), (-574.0065403938, -373.7331484828), (-564.7094951377, -364.4361032266))
            Line((-564.7094951377, -364.4361032266), (-586.7065403938, -364.4361032266))
            ThreePointArc((-586.7065403938, -364.4361032266), (-595.6867965149, -360.7163593477), (-599.4065403938, -351.7361032266))
            Line((-599.4065403938, -351.7361032266), (-599.4065403938, -329.7390579705))
        make_face()
        with BuildLine():
            ThreePointArc((-561.3065403938, -351.7361032266), (-574.0065403938, -329.7390579705), (-599.4065403938, -329.7390579705))
            Line((-599.4065403938, -329.7390579705), (-599.4065403938, -351.7361032266))
            ThreePointArc((-599.4065403938, -351.7361032266), (-595.6867965149, -360.7163593477), (-586.7065403938, -364.4361032266))
            Line((-586.7065403938, -364.4361032266), (-564.7094951377, -364.4361032266))
            ThreePointArc((-564.7094951377, -364.4361032266), (-562.1720244061, -358.3101069722), (-561.3065403938, -351.7361032266))
        make_face()
        with BuildLine():
            Line((-535.9065403938, -377.1361032266), (-535.9065403938, -364.4361032266))
            Line((-535.9065403938, -364.4361032266), (-564.7094951377, -364.4361032266))
            ThreePointArc((-564.7094951377, -364.4361032266), (-574.0065403938, -373.7331484828), (-586.7065403938, -377.1361032266))
            Line((-586.7065403938, -377.1361032266), (-535.9065403938, -377.1361032266))
        make_face()
        Polygon((-421.6065403938, -364.4361032266), (-535.9065403938, -364.4361032266), (-535.9065403938, -377.1361032266), (530.8934596062, -377.1361032266), (530.8934596062, -364.4361032266), (416.5934596062, -364.4361032266), (378.4934596062, -364.4361032266), (-383.5065403938, -364.4361032266), align=None)
        with BuildLine():
            Line((581.6934596062, 384.8638967734), (530.8934596062, 384.8638967734))
            Line((530.8934596062, 384.8638967734), (530.8934596062, 372.1638967734))
            Line((530.8934596062, 372.1638967734), (559.69641435, 372.1638967734))
            ThreePointArc((559.69641435, 372.1638967734), (568.9934596062, 381.4609420295), (581.6934596062, 384.8638967734))
        make_face()
        with BuildLine():
            Line((581.6934596062, 372.1638967734), (559.69641435, 372.1638967734))
            ThreePointArc((559.69641435, 372.1638967734), (563.732947364, 341.5033845312), (594.3934596062, 337.4668515172))
            Line((594.3934596062, 337.4668515172), (594.3934596062, 359.4638967734))
            ThreePointArc((594.3934596062, 359.4638967734), (590.6737157272, 368.4441528944), (581.6934596062, 372.1638967734))
        make_face()
        with BuildLine():
            Line((559.69641435, 372.1638967734), (530.8934596062, 372.1638967734))
            Line((530.8934596062, 372.1638967734), (530.8934596062, 237.7141806602))
            Line((530.8934596062, 237.7141806602), (530.8934596062, -219.4858193398))
            Line((530.8934596062, -219.4858193398), (530.8934596062, -364.4361032266))
            Line((530.8934596062, -364.4361032266), (559.69641435, -364.4361032266))
            ThreePointArc((559.69641435, -364.4361032266), (563.732947364, -333.7755909845), (594.3934596062, -329.7390579705))
            Line((594.3934596062, -329.7390579705), (594.3934596062, -15.1861032266))
            Line((594.3934596062, -15.1861032266), (594.3934596062, 22.9138967734))
            Line((594.3934596062, 22.9138967734), (594.3934596062, 337.4668515172))
            ThreePointArc((594.3934596062, 337.4668515172), (563.732947364, 341.5033845312), (559.69641435, 372.1638967734))
        make_face()
        with BuildLine():
            Line((607.0934596062, -351.7361032266), (607.0934596062, 359.4638967734))
            ThreePointArc((607.0934596062, 359.4638967734), (603.6905048623, 346.7638967734), (594.3934596062, 337.4668515172))
            Line((594.3934596062, 337.4668515172), (594.3934596062, 22.9138967734))
            Line((594.3934596062, 22.9138967734), (594.3934596062, -15.1861032266))
            Line((594.3934596062, -15.1861032266), (594.3934596062, -329.7390579705))
            ThreePointArc((594.3934596062, -329.7390579705), (603.6905048623, -339.0361032266), (607.0934596062, -351.7361032266))
        make_face()
        with BuildLine():
            ThreePointArc((607.0934596062, 359.4638967734), (599.6539718483, 377.4244090155), (581.6934596062, 384.8638967734))
            ThreePointArc((581.6934596062, 384.8638967734), (568.9934596062, 381.4609420295), (559.69641435, 372.1638967734))
            Line((559.69641435, 372.1638967734), (581.6934596062, 372.1638967734))
            ThreePointArc((581.6934596062, 372.1638967734), (590.6737157272, 368.4441528944), (594.3934596062, 359.4638967734))
            Line((594.3934596062, 359.4638967734), (594.3934596062, 337.4668515172))
            ThreePointArc((594.3934596062, 337.4668515172), (603.6905048623, 346.7638967734), (607.0934596062, 359.4638967734))
        make_face()
        with BuildLine():
            Line((530.8934596062, -364.4361032266), (530.8934596062, -377.1361032266))
            Line((530.8934596062, -377.1361032266), (581.6934596062, -377.1361032266))
            ThreePointArc((581.6934596062, -377.1361032266), (568.9934596062, -373.7331484828), (559.69641435, -364.4361032266))
            Line((559.69641435, -364.4361032266), (530.8934596062, -364.4361032266))
        make_face()
        with BuildLine():
            Line((594.3934596062, -351.7361032266), (594.3934596062, -329.7390579705))
            ThreePointArc((594.3934596062, -329.7390579705), (563.732947364, -333.7755909845), (559.69641435, -364.4361032266))
            Line((559.69641435, -364.4361032266), (581.6934596062, -364.4361032266))
            ThreePointArc((581.6934596062, -364.4361032266), (590.6737157272, -360.7163593477), (594.3934596062, -351.7361032266))
        make_face()
        with BuildLine():
            ThreePointArc((581.6934596062, -377.1361032266), (599.6539718483, -369.6966154688), (607.0934596062, -351.7361032266))
            ThreePointArc((607.0934596062, -351.7361032266), (603.6905048623, -339.0361032266), (594.3934596062, -329.7390579705))
            Line((594.3934596062, -329.7390579705), (594.3934596062, -351.7361032266))
            ThreePointArc((594.3934596062, -351.7361032266), (590.6737157272, -360.7163593477), (581.6934596062, -364.4361032266))
            Line((581.6934596062, -364.4361032266), (559.69641435, -364.4361032266))
            ThreePointArc((559.69641435, -364.4361032266), (568.9934596062, -373.7331484828), (581.6934596062, -377.1361032266))
        make_face()
    extrude(amount=F5_DEPTH)


with BuildPart() as f6:
    # F0 (on Top) → F6 (new body)
    with BuildSketch(Plane.XY.offset(F6_START)):
        with BuildLine():
            ThreePointArc((-561.3065403938, 359.4638967734), (-562.1720244061, 366.037900519), (-564.7094951377, 372.1638967734))
            Line((-564.7094951377, 372.1638967734), (-586.7065403938, 372.1638967734))
            ThreePointArc((-586.7065403938, 372.1638967734), (-595.6867965149, 368.4441528944), (-599.4065403938, 359.4638967734))
            Line((-599.4065403938, 359.4638967734), (-599.4065403938, 337.4668515172))
            ThreePointArc((-599.4065403938, 337.4668515172), (-574.0065403938, 337.4668515172), (-561.3065403938, 359.4638967734))
        make_face()
        with BuildLine():
            Line((-535.9065403938, 372.1638967734), (-564.7094951377, 372.1638967734))
            ThreePointArc((-564.7094951377, 372.1638967734), (-562.1720244061, 366.037900519), (-561.3065403938, 359.4638967734))
            ThreePointArc((-561.3065403938, 359.4638967734), (-574.0065403938, 337.4668515172), (-599.4065403938, 337.4668515172))
            Line((-599.4065403938, 337.4668515172), (-599.4065403938, 22.9138967734))
            Line((-599.4065403938, 22.9138967734), (-599.4065403938, -15.1861032266))
            Line((-599.4065403938, -15.1861032266), (-599.4065403938, -329.7390579705))
            ThreePointArc((-599.4065403938, -329.7390579705), (-574.0065403938, -329.7390579705), (-561.3065403938, -351.7361032266))
            ThreePointArc((-561.3065403938, -351.7361032266), (-562.1720244061, -358.3101069722), (-564.7094951377, -364.4361032266))
            Line((-564.7094951377, -364.4361032266), (-535.9065403938, -364.4361032266))
            Line((-535.9065403938, -364.4361032266), (-535.9065403938, 372.1638967734))
        make_face()
        Polygon((-421.6065403938, 372.1638967734), (-535.9065403938, 372.1638967734), (-535.9065403938, -364.4361032266), (-421.6065403938, -364.4361032266), (-383.5065403938, -364.4361032266), (378.4934596062, -364.4361032266), (416.5934596062, -364.4361032266), (530.8934596062, -364.4361032266), (530.8934596062, -219.4858193398), (530.8934596062, 237.7141806602), (530.8934596062, 372.1638967734), (416.5934596062, 372.1638967734), (378.4934596062, 372.1638967734), (-383.5065403938, 372.1638967734), align=None)
        with BuildLine():
            ThreePointArc((-561.3065403938, -351.7361032266), (-574.0065403938, -329.7390579705), (-599.4065403938, -329.7390579705))
            Line((-599.4065403938, -329.7390579705), (-599.4065403938, -351.7361032266))
            ThreePointArc((-599.4065403938, -351.7361032266), (-595.6867965149, -360.7163593477), (-586.7065403938, -364.4361032266))
            Line((-586.7065403938, -364.4361032266), (-564.7094951377, -364.4361032266))
            ThreePointArc((-564.7094951377, -364.4361032266), (-562.1720244061, -358.3101069722), (-561.3065403938, -351.7361032266))
        make_face()
        with BuildLine():
            Line((581.6934596062, 372.1638967734), (559.69641435, 372.1638967734))
            ThreePointArc((559.69641435, 372.1638967734), (563.732947364, 341.5033845312), (594.3934596062, 337.4668515172))
            Line((594.3934596062, 337.4668515172), (594.3934596062, 359.4638967734))
            ThreePointArc((594.3934596062, 359.4638967734), (590.6737157272, 368.4441528944), (581.6934596062, 372.1638967734))
        make_face()
        with BuildLine():
            Line((559.69641435, 372.1638967734), (530.8934596062, 372.1638967734))
            Line((530.8934596062, 372.1638967734), (530.8934596062, 237.7141806602))
            Line((530.8934596062, 237.7141806602), (530.8934596062, -219.4858193398))
            Line((530.8934596062, -219.4858193398), (530.8934596062, -364.4361032266))
            Line((530.8934596062, -364.4361032266), (559.69641435, -364.4361032266))
            ThreePointArc((559.69641435, -364.4361032266), (563.732947364, -333.7755909845), (594.3934596062, -329.7390579705))
            Line((594.3934596062, -329.7390579705), (594.3934596062, -15.1861032266))
            Line((594.3934596062, -15.1861032266), (594.3934596062, 22.9138967734))
            Line((594.3934596062, 22.9138967734), (594.3934596062, 337.4668515172))
            ThreePointArc((594.3934596062, 337.4668515172), (563.732947364, 341.5033845312), (559.69641435, 372.1638967734))
        make_face()
        with BuildLine():
            Line((594.3934596062, -351.7361032266), (594.3934596062, -329.7390579705))
            ThreePointArc((594.3934596062, -329.7390579705), (563.732947364, -333.7755909845), (559.69641435, -364.4361032266))
            Line((559.69641435, -364.4361032266), (581.6934596062, -364.4361032266))
            ThreePointArc((581.6934596062, -364.4361032266), (590.6737157272, -360.7163593477), (594.3934596062, -351.7361032266))
        make_face()
    extrude(amount=F6_DEPTH)

    # F7
    f7_edges = [f6.edges().sort_by_distance(p)[0] for p in [
        (-595.686797, 368.444153, 304.8),
        (-599.40654, 3.863897, 304.8),
        (-595.686797, -360.716359, 304.8),
        (-2.50654, -364.436103, 304.8),
        (590.673716, -360.716359, 304.8),
        (594.39346, 3.863897, 304.8),
        (590.673716, 368.444153, 304.8),
        (-2.50654, 372.163897, 304.8),
    ]]
    chamfer(f7_edges, length=F7_SIZE, length2=F7_SIZE2)


solid = Compound([f1.part, f2.part, f4.part, f4b.part, f4c.part, f4d.part, f5.part, f6.part])
